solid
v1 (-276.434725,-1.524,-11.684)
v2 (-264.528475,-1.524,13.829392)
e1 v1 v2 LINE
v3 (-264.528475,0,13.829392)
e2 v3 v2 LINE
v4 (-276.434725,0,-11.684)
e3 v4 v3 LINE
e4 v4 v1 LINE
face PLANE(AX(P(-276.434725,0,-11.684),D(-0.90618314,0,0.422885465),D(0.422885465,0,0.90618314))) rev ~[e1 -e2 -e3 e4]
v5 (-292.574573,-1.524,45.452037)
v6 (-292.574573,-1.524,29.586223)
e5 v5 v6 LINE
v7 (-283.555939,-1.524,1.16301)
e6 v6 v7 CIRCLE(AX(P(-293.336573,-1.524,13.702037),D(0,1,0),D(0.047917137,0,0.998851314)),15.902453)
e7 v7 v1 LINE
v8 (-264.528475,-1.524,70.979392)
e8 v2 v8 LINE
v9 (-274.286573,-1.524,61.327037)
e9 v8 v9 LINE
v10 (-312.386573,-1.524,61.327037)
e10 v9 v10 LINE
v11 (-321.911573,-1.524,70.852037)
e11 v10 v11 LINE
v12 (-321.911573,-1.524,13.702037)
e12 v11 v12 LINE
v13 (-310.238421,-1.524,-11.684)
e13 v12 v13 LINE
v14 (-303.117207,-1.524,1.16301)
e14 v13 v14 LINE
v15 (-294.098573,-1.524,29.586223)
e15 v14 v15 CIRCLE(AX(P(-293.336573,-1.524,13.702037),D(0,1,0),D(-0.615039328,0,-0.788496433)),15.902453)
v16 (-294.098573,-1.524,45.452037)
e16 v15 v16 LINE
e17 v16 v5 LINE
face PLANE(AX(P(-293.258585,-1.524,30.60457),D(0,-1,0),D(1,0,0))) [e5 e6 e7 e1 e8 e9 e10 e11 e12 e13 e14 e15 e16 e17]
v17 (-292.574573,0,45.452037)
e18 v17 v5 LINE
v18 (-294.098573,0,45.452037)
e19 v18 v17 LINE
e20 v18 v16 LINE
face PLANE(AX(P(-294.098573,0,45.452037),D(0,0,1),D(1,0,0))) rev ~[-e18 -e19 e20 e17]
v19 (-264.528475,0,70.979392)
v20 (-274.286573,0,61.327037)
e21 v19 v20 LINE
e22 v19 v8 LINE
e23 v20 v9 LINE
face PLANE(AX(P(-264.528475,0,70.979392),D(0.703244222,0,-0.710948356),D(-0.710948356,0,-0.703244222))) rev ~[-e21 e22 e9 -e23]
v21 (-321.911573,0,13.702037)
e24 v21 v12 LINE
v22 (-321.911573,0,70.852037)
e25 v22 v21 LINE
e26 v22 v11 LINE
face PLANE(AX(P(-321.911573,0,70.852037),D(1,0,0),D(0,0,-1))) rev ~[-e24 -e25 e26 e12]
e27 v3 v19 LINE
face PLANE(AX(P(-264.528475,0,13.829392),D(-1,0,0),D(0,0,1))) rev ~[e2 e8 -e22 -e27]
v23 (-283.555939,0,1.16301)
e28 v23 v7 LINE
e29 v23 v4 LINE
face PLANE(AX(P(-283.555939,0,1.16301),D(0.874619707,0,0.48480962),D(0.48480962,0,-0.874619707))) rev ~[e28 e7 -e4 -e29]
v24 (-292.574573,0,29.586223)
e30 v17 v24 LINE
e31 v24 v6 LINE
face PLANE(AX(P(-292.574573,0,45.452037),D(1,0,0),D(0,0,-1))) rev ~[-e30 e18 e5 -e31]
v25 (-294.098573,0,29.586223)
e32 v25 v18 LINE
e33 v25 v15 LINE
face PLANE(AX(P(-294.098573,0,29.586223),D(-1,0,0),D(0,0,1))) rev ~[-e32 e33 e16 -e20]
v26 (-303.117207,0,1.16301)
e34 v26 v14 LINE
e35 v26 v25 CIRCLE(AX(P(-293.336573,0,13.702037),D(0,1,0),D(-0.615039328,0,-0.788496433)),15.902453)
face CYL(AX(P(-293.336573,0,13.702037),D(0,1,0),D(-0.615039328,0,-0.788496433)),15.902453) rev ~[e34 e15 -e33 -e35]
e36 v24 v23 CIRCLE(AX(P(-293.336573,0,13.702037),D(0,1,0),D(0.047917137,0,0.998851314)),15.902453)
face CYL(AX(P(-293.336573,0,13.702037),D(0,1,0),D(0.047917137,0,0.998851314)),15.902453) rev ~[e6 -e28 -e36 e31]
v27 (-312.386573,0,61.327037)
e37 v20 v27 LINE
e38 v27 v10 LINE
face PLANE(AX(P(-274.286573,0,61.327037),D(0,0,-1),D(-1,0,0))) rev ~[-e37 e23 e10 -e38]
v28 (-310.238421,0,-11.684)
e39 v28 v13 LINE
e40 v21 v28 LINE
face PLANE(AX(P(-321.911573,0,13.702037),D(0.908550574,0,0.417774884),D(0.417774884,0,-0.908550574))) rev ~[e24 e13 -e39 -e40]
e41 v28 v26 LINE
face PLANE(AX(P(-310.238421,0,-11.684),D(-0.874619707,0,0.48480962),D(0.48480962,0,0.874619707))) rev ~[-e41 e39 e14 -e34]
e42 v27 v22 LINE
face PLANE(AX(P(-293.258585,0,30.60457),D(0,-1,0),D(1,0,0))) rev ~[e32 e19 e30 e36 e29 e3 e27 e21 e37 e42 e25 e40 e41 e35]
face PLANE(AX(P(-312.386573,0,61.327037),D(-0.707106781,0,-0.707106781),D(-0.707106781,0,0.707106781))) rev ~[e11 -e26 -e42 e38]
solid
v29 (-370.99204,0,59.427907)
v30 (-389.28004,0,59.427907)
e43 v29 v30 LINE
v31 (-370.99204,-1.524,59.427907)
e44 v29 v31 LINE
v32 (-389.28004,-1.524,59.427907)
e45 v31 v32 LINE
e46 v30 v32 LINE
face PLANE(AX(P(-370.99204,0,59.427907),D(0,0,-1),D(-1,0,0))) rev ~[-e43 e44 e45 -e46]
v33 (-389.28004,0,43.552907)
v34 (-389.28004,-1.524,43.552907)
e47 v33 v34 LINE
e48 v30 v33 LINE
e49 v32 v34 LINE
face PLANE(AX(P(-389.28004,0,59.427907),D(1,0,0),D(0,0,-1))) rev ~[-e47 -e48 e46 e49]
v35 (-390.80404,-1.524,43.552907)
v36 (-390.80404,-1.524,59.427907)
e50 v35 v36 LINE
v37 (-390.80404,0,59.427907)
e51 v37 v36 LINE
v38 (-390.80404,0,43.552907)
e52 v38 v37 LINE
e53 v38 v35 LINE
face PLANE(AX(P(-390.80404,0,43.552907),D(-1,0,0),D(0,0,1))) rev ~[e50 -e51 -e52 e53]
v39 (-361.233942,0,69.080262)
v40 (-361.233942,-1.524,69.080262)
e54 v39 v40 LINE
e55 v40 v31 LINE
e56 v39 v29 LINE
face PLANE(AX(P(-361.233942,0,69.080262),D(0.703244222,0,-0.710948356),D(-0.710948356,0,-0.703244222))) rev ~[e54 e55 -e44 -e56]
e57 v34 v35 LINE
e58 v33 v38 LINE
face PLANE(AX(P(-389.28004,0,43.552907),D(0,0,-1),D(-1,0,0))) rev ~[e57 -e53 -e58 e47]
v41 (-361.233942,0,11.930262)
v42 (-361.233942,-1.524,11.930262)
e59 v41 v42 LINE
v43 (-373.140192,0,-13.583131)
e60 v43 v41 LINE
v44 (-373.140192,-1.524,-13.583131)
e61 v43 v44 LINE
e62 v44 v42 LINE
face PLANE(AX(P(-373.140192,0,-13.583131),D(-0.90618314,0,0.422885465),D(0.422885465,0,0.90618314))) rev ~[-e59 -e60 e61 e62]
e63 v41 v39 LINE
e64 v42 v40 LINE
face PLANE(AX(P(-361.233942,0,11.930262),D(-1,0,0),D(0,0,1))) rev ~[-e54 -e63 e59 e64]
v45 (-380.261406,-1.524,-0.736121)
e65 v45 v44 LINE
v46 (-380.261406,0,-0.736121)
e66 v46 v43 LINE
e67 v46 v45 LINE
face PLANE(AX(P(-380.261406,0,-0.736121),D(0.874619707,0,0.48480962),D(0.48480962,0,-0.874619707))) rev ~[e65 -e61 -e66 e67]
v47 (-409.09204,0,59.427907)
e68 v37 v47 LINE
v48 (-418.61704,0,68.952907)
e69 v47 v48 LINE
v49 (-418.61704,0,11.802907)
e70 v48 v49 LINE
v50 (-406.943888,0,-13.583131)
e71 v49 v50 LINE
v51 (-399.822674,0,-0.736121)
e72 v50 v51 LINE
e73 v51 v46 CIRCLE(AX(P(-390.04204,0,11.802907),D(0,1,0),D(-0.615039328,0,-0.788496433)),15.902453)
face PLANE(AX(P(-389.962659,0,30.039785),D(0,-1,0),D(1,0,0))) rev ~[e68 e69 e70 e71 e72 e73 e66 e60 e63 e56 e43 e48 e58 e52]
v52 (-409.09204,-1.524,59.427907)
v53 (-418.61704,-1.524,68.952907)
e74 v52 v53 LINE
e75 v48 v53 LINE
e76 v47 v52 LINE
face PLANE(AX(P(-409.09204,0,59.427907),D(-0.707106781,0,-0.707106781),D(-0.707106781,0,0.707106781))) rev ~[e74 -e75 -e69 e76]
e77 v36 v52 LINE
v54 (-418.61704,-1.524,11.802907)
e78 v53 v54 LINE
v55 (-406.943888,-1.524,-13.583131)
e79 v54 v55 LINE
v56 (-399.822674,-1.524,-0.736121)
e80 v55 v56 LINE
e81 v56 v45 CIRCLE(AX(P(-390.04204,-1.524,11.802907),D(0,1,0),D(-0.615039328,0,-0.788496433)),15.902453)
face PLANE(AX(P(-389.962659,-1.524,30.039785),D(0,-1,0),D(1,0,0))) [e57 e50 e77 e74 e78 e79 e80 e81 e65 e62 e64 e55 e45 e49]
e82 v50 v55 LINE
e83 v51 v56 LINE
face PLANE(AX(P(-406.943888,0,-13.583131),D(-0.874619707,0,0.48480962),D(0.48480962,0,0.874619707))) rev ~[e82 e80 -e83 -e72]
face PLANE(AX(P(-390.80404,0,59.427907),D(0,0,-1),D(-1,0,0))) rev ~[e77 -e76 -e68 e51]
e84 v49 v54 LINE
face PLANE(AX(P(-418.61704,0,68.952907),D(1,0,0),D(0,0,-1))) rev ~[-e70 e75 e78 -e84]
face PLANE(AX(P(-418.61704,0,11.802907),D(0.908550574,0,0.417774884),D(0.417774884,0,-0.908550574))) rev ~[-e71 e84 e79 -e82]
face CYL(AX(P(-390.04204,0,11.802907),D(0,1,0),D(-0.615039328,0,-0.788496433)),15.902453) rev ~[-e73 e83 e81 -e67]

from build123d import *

# Parameters (mm, degrees)
F1_DEPTH = 1.524


# Not quite as in the source:
# - a feature names something its author has since deleted; it is built from what else it names


with BuildPart() as f1:
    # F0 (on Front) → F1 (new body)
    with BuildSketch(Plane.XZ):
        with BuildLine():
            ThreePointArc((-399.8226737201, -0.736120695), (-390.0420399189, 27.705359182), (-380.2614061177, -0.736120695))
            Line((-380.2614061177, -0.736120695), (-373.1401919201, -13.583131183))
            Line((-373.1401919201, -13.583131183), (-361.2339419201, 11.9302616742))
            Line((-361.2339419201, 11.9302616742), (-361.2339419201, 59.5552616742))
            Line((-361.2339419201, 59.5552616742), (-361.2339419201, 69.0802616742))
            Line((-361.2339419201, 69.0802616742), (-370.9920399189, 59.4279065132))
            Line((-370.9920399189, 59.4279065132), (-389.2800399189, 59.4279065132))
            Line((-389.2800399189, 59.4279065132), (-389.2800399189, 43.5529065132))
            Line((-389.2800399189, 43.5529065132), (-390.0420399189, 43.5529065132))
            Line((-390.0420399189, 43.5529065132), (-390.8040399189, 43.5529065132))
            Line((-390.8040399189, 43.5529065132), (-390.8040399189, 59.4279065132))
            Line((-390.8040399189, 59.4279065132), (-409.0920399189, 59.4279065132))
            Line((-409.0920399189, 59.4279065132), (-418.6170399189, 68.9529065132))
            Line((-418.6170399189, 68.9529065132), (-418.6170399189, 59.4279065132))
            Line((-418.6170399189, 59.4279065132), (-418.6170399189, 11.8029065132))
            Line((-418.6170399189, 11.8029065132), (-406.9438879177, -13.583131183))
            Line((-406.9438879177, -13.583131183), (-399.8226737201, -0.736120695))
        make_face()
    extrude(amount=F1_DEPTH)


with BuildPart() as f1b:
    # F0 (on Front) → F1, piece 2 (new body)
    with BuildSketch(Plane.XZ):
        with BuildLine():
            ThreePointArc((-292.5745729645, 29.5862229522), (-278.1788508217, 18.5115548851), (-283.5559391633, 1.1630099959))
            Line((-283.5559391633, 1.1630099959), (-276.4347249657, -11.6840004921))
            Line((-276.4347249657, -11.6840004921), (-264.5284749657, 13.8293923651))
            Line((-264.5284749657, 13.8293923651), (-264.5284749657, 61.4543923651))
            Line((-264.5284749657, 61.4543923651), (-264.5284749657, 70.9793923651))
            Line((-264.5284749657, 70.9793923651), (-274.2865729645, 61.3270372041))
            Line((-274.2865729645, 61.3270372041), (-312.3865729645, 61.3270372041))
            Line((-312.3865729645, 61.3270372041), (-321.9115729645, 70.8520372041))
            Line((-321.9115729645, 70.8520372041), (-321.9115729645, 61.3270372041))
            Line((-321.9115729645, 61.3270372041), (-321.9115729645, 13.7020372041))
            Line((-321.9115729645, 13.7020372041), (-310.2384209633, -11.6840004921))
            Line((-310.2384209633, -11.6840004921), (-303.1172067657, 1.1630099959))
            ThreePointArc((-303.1172067657, 1.1630099959), (-308.4942951073, 18.5115548851), (-294.0985729645, 29.5862229522))
            Line((-294.0985729645, 29.5862229522), (-294.0985729645, 45.4520372041))
            Line((-294.0985729645, 45.4520372041), (-293.3365729645, 45.4520372041))
            Line((-293.3365729645, 45.4520372041), (-292.5745729645, 45.4520372041))
            Line((-292.5745729645, 45.4520372041), (-292.5745729645, 29.5862229522))
        make_face()
    extrude(amount=F1_DEPTH)


solid = Compound([f1.part, f1b.part])
